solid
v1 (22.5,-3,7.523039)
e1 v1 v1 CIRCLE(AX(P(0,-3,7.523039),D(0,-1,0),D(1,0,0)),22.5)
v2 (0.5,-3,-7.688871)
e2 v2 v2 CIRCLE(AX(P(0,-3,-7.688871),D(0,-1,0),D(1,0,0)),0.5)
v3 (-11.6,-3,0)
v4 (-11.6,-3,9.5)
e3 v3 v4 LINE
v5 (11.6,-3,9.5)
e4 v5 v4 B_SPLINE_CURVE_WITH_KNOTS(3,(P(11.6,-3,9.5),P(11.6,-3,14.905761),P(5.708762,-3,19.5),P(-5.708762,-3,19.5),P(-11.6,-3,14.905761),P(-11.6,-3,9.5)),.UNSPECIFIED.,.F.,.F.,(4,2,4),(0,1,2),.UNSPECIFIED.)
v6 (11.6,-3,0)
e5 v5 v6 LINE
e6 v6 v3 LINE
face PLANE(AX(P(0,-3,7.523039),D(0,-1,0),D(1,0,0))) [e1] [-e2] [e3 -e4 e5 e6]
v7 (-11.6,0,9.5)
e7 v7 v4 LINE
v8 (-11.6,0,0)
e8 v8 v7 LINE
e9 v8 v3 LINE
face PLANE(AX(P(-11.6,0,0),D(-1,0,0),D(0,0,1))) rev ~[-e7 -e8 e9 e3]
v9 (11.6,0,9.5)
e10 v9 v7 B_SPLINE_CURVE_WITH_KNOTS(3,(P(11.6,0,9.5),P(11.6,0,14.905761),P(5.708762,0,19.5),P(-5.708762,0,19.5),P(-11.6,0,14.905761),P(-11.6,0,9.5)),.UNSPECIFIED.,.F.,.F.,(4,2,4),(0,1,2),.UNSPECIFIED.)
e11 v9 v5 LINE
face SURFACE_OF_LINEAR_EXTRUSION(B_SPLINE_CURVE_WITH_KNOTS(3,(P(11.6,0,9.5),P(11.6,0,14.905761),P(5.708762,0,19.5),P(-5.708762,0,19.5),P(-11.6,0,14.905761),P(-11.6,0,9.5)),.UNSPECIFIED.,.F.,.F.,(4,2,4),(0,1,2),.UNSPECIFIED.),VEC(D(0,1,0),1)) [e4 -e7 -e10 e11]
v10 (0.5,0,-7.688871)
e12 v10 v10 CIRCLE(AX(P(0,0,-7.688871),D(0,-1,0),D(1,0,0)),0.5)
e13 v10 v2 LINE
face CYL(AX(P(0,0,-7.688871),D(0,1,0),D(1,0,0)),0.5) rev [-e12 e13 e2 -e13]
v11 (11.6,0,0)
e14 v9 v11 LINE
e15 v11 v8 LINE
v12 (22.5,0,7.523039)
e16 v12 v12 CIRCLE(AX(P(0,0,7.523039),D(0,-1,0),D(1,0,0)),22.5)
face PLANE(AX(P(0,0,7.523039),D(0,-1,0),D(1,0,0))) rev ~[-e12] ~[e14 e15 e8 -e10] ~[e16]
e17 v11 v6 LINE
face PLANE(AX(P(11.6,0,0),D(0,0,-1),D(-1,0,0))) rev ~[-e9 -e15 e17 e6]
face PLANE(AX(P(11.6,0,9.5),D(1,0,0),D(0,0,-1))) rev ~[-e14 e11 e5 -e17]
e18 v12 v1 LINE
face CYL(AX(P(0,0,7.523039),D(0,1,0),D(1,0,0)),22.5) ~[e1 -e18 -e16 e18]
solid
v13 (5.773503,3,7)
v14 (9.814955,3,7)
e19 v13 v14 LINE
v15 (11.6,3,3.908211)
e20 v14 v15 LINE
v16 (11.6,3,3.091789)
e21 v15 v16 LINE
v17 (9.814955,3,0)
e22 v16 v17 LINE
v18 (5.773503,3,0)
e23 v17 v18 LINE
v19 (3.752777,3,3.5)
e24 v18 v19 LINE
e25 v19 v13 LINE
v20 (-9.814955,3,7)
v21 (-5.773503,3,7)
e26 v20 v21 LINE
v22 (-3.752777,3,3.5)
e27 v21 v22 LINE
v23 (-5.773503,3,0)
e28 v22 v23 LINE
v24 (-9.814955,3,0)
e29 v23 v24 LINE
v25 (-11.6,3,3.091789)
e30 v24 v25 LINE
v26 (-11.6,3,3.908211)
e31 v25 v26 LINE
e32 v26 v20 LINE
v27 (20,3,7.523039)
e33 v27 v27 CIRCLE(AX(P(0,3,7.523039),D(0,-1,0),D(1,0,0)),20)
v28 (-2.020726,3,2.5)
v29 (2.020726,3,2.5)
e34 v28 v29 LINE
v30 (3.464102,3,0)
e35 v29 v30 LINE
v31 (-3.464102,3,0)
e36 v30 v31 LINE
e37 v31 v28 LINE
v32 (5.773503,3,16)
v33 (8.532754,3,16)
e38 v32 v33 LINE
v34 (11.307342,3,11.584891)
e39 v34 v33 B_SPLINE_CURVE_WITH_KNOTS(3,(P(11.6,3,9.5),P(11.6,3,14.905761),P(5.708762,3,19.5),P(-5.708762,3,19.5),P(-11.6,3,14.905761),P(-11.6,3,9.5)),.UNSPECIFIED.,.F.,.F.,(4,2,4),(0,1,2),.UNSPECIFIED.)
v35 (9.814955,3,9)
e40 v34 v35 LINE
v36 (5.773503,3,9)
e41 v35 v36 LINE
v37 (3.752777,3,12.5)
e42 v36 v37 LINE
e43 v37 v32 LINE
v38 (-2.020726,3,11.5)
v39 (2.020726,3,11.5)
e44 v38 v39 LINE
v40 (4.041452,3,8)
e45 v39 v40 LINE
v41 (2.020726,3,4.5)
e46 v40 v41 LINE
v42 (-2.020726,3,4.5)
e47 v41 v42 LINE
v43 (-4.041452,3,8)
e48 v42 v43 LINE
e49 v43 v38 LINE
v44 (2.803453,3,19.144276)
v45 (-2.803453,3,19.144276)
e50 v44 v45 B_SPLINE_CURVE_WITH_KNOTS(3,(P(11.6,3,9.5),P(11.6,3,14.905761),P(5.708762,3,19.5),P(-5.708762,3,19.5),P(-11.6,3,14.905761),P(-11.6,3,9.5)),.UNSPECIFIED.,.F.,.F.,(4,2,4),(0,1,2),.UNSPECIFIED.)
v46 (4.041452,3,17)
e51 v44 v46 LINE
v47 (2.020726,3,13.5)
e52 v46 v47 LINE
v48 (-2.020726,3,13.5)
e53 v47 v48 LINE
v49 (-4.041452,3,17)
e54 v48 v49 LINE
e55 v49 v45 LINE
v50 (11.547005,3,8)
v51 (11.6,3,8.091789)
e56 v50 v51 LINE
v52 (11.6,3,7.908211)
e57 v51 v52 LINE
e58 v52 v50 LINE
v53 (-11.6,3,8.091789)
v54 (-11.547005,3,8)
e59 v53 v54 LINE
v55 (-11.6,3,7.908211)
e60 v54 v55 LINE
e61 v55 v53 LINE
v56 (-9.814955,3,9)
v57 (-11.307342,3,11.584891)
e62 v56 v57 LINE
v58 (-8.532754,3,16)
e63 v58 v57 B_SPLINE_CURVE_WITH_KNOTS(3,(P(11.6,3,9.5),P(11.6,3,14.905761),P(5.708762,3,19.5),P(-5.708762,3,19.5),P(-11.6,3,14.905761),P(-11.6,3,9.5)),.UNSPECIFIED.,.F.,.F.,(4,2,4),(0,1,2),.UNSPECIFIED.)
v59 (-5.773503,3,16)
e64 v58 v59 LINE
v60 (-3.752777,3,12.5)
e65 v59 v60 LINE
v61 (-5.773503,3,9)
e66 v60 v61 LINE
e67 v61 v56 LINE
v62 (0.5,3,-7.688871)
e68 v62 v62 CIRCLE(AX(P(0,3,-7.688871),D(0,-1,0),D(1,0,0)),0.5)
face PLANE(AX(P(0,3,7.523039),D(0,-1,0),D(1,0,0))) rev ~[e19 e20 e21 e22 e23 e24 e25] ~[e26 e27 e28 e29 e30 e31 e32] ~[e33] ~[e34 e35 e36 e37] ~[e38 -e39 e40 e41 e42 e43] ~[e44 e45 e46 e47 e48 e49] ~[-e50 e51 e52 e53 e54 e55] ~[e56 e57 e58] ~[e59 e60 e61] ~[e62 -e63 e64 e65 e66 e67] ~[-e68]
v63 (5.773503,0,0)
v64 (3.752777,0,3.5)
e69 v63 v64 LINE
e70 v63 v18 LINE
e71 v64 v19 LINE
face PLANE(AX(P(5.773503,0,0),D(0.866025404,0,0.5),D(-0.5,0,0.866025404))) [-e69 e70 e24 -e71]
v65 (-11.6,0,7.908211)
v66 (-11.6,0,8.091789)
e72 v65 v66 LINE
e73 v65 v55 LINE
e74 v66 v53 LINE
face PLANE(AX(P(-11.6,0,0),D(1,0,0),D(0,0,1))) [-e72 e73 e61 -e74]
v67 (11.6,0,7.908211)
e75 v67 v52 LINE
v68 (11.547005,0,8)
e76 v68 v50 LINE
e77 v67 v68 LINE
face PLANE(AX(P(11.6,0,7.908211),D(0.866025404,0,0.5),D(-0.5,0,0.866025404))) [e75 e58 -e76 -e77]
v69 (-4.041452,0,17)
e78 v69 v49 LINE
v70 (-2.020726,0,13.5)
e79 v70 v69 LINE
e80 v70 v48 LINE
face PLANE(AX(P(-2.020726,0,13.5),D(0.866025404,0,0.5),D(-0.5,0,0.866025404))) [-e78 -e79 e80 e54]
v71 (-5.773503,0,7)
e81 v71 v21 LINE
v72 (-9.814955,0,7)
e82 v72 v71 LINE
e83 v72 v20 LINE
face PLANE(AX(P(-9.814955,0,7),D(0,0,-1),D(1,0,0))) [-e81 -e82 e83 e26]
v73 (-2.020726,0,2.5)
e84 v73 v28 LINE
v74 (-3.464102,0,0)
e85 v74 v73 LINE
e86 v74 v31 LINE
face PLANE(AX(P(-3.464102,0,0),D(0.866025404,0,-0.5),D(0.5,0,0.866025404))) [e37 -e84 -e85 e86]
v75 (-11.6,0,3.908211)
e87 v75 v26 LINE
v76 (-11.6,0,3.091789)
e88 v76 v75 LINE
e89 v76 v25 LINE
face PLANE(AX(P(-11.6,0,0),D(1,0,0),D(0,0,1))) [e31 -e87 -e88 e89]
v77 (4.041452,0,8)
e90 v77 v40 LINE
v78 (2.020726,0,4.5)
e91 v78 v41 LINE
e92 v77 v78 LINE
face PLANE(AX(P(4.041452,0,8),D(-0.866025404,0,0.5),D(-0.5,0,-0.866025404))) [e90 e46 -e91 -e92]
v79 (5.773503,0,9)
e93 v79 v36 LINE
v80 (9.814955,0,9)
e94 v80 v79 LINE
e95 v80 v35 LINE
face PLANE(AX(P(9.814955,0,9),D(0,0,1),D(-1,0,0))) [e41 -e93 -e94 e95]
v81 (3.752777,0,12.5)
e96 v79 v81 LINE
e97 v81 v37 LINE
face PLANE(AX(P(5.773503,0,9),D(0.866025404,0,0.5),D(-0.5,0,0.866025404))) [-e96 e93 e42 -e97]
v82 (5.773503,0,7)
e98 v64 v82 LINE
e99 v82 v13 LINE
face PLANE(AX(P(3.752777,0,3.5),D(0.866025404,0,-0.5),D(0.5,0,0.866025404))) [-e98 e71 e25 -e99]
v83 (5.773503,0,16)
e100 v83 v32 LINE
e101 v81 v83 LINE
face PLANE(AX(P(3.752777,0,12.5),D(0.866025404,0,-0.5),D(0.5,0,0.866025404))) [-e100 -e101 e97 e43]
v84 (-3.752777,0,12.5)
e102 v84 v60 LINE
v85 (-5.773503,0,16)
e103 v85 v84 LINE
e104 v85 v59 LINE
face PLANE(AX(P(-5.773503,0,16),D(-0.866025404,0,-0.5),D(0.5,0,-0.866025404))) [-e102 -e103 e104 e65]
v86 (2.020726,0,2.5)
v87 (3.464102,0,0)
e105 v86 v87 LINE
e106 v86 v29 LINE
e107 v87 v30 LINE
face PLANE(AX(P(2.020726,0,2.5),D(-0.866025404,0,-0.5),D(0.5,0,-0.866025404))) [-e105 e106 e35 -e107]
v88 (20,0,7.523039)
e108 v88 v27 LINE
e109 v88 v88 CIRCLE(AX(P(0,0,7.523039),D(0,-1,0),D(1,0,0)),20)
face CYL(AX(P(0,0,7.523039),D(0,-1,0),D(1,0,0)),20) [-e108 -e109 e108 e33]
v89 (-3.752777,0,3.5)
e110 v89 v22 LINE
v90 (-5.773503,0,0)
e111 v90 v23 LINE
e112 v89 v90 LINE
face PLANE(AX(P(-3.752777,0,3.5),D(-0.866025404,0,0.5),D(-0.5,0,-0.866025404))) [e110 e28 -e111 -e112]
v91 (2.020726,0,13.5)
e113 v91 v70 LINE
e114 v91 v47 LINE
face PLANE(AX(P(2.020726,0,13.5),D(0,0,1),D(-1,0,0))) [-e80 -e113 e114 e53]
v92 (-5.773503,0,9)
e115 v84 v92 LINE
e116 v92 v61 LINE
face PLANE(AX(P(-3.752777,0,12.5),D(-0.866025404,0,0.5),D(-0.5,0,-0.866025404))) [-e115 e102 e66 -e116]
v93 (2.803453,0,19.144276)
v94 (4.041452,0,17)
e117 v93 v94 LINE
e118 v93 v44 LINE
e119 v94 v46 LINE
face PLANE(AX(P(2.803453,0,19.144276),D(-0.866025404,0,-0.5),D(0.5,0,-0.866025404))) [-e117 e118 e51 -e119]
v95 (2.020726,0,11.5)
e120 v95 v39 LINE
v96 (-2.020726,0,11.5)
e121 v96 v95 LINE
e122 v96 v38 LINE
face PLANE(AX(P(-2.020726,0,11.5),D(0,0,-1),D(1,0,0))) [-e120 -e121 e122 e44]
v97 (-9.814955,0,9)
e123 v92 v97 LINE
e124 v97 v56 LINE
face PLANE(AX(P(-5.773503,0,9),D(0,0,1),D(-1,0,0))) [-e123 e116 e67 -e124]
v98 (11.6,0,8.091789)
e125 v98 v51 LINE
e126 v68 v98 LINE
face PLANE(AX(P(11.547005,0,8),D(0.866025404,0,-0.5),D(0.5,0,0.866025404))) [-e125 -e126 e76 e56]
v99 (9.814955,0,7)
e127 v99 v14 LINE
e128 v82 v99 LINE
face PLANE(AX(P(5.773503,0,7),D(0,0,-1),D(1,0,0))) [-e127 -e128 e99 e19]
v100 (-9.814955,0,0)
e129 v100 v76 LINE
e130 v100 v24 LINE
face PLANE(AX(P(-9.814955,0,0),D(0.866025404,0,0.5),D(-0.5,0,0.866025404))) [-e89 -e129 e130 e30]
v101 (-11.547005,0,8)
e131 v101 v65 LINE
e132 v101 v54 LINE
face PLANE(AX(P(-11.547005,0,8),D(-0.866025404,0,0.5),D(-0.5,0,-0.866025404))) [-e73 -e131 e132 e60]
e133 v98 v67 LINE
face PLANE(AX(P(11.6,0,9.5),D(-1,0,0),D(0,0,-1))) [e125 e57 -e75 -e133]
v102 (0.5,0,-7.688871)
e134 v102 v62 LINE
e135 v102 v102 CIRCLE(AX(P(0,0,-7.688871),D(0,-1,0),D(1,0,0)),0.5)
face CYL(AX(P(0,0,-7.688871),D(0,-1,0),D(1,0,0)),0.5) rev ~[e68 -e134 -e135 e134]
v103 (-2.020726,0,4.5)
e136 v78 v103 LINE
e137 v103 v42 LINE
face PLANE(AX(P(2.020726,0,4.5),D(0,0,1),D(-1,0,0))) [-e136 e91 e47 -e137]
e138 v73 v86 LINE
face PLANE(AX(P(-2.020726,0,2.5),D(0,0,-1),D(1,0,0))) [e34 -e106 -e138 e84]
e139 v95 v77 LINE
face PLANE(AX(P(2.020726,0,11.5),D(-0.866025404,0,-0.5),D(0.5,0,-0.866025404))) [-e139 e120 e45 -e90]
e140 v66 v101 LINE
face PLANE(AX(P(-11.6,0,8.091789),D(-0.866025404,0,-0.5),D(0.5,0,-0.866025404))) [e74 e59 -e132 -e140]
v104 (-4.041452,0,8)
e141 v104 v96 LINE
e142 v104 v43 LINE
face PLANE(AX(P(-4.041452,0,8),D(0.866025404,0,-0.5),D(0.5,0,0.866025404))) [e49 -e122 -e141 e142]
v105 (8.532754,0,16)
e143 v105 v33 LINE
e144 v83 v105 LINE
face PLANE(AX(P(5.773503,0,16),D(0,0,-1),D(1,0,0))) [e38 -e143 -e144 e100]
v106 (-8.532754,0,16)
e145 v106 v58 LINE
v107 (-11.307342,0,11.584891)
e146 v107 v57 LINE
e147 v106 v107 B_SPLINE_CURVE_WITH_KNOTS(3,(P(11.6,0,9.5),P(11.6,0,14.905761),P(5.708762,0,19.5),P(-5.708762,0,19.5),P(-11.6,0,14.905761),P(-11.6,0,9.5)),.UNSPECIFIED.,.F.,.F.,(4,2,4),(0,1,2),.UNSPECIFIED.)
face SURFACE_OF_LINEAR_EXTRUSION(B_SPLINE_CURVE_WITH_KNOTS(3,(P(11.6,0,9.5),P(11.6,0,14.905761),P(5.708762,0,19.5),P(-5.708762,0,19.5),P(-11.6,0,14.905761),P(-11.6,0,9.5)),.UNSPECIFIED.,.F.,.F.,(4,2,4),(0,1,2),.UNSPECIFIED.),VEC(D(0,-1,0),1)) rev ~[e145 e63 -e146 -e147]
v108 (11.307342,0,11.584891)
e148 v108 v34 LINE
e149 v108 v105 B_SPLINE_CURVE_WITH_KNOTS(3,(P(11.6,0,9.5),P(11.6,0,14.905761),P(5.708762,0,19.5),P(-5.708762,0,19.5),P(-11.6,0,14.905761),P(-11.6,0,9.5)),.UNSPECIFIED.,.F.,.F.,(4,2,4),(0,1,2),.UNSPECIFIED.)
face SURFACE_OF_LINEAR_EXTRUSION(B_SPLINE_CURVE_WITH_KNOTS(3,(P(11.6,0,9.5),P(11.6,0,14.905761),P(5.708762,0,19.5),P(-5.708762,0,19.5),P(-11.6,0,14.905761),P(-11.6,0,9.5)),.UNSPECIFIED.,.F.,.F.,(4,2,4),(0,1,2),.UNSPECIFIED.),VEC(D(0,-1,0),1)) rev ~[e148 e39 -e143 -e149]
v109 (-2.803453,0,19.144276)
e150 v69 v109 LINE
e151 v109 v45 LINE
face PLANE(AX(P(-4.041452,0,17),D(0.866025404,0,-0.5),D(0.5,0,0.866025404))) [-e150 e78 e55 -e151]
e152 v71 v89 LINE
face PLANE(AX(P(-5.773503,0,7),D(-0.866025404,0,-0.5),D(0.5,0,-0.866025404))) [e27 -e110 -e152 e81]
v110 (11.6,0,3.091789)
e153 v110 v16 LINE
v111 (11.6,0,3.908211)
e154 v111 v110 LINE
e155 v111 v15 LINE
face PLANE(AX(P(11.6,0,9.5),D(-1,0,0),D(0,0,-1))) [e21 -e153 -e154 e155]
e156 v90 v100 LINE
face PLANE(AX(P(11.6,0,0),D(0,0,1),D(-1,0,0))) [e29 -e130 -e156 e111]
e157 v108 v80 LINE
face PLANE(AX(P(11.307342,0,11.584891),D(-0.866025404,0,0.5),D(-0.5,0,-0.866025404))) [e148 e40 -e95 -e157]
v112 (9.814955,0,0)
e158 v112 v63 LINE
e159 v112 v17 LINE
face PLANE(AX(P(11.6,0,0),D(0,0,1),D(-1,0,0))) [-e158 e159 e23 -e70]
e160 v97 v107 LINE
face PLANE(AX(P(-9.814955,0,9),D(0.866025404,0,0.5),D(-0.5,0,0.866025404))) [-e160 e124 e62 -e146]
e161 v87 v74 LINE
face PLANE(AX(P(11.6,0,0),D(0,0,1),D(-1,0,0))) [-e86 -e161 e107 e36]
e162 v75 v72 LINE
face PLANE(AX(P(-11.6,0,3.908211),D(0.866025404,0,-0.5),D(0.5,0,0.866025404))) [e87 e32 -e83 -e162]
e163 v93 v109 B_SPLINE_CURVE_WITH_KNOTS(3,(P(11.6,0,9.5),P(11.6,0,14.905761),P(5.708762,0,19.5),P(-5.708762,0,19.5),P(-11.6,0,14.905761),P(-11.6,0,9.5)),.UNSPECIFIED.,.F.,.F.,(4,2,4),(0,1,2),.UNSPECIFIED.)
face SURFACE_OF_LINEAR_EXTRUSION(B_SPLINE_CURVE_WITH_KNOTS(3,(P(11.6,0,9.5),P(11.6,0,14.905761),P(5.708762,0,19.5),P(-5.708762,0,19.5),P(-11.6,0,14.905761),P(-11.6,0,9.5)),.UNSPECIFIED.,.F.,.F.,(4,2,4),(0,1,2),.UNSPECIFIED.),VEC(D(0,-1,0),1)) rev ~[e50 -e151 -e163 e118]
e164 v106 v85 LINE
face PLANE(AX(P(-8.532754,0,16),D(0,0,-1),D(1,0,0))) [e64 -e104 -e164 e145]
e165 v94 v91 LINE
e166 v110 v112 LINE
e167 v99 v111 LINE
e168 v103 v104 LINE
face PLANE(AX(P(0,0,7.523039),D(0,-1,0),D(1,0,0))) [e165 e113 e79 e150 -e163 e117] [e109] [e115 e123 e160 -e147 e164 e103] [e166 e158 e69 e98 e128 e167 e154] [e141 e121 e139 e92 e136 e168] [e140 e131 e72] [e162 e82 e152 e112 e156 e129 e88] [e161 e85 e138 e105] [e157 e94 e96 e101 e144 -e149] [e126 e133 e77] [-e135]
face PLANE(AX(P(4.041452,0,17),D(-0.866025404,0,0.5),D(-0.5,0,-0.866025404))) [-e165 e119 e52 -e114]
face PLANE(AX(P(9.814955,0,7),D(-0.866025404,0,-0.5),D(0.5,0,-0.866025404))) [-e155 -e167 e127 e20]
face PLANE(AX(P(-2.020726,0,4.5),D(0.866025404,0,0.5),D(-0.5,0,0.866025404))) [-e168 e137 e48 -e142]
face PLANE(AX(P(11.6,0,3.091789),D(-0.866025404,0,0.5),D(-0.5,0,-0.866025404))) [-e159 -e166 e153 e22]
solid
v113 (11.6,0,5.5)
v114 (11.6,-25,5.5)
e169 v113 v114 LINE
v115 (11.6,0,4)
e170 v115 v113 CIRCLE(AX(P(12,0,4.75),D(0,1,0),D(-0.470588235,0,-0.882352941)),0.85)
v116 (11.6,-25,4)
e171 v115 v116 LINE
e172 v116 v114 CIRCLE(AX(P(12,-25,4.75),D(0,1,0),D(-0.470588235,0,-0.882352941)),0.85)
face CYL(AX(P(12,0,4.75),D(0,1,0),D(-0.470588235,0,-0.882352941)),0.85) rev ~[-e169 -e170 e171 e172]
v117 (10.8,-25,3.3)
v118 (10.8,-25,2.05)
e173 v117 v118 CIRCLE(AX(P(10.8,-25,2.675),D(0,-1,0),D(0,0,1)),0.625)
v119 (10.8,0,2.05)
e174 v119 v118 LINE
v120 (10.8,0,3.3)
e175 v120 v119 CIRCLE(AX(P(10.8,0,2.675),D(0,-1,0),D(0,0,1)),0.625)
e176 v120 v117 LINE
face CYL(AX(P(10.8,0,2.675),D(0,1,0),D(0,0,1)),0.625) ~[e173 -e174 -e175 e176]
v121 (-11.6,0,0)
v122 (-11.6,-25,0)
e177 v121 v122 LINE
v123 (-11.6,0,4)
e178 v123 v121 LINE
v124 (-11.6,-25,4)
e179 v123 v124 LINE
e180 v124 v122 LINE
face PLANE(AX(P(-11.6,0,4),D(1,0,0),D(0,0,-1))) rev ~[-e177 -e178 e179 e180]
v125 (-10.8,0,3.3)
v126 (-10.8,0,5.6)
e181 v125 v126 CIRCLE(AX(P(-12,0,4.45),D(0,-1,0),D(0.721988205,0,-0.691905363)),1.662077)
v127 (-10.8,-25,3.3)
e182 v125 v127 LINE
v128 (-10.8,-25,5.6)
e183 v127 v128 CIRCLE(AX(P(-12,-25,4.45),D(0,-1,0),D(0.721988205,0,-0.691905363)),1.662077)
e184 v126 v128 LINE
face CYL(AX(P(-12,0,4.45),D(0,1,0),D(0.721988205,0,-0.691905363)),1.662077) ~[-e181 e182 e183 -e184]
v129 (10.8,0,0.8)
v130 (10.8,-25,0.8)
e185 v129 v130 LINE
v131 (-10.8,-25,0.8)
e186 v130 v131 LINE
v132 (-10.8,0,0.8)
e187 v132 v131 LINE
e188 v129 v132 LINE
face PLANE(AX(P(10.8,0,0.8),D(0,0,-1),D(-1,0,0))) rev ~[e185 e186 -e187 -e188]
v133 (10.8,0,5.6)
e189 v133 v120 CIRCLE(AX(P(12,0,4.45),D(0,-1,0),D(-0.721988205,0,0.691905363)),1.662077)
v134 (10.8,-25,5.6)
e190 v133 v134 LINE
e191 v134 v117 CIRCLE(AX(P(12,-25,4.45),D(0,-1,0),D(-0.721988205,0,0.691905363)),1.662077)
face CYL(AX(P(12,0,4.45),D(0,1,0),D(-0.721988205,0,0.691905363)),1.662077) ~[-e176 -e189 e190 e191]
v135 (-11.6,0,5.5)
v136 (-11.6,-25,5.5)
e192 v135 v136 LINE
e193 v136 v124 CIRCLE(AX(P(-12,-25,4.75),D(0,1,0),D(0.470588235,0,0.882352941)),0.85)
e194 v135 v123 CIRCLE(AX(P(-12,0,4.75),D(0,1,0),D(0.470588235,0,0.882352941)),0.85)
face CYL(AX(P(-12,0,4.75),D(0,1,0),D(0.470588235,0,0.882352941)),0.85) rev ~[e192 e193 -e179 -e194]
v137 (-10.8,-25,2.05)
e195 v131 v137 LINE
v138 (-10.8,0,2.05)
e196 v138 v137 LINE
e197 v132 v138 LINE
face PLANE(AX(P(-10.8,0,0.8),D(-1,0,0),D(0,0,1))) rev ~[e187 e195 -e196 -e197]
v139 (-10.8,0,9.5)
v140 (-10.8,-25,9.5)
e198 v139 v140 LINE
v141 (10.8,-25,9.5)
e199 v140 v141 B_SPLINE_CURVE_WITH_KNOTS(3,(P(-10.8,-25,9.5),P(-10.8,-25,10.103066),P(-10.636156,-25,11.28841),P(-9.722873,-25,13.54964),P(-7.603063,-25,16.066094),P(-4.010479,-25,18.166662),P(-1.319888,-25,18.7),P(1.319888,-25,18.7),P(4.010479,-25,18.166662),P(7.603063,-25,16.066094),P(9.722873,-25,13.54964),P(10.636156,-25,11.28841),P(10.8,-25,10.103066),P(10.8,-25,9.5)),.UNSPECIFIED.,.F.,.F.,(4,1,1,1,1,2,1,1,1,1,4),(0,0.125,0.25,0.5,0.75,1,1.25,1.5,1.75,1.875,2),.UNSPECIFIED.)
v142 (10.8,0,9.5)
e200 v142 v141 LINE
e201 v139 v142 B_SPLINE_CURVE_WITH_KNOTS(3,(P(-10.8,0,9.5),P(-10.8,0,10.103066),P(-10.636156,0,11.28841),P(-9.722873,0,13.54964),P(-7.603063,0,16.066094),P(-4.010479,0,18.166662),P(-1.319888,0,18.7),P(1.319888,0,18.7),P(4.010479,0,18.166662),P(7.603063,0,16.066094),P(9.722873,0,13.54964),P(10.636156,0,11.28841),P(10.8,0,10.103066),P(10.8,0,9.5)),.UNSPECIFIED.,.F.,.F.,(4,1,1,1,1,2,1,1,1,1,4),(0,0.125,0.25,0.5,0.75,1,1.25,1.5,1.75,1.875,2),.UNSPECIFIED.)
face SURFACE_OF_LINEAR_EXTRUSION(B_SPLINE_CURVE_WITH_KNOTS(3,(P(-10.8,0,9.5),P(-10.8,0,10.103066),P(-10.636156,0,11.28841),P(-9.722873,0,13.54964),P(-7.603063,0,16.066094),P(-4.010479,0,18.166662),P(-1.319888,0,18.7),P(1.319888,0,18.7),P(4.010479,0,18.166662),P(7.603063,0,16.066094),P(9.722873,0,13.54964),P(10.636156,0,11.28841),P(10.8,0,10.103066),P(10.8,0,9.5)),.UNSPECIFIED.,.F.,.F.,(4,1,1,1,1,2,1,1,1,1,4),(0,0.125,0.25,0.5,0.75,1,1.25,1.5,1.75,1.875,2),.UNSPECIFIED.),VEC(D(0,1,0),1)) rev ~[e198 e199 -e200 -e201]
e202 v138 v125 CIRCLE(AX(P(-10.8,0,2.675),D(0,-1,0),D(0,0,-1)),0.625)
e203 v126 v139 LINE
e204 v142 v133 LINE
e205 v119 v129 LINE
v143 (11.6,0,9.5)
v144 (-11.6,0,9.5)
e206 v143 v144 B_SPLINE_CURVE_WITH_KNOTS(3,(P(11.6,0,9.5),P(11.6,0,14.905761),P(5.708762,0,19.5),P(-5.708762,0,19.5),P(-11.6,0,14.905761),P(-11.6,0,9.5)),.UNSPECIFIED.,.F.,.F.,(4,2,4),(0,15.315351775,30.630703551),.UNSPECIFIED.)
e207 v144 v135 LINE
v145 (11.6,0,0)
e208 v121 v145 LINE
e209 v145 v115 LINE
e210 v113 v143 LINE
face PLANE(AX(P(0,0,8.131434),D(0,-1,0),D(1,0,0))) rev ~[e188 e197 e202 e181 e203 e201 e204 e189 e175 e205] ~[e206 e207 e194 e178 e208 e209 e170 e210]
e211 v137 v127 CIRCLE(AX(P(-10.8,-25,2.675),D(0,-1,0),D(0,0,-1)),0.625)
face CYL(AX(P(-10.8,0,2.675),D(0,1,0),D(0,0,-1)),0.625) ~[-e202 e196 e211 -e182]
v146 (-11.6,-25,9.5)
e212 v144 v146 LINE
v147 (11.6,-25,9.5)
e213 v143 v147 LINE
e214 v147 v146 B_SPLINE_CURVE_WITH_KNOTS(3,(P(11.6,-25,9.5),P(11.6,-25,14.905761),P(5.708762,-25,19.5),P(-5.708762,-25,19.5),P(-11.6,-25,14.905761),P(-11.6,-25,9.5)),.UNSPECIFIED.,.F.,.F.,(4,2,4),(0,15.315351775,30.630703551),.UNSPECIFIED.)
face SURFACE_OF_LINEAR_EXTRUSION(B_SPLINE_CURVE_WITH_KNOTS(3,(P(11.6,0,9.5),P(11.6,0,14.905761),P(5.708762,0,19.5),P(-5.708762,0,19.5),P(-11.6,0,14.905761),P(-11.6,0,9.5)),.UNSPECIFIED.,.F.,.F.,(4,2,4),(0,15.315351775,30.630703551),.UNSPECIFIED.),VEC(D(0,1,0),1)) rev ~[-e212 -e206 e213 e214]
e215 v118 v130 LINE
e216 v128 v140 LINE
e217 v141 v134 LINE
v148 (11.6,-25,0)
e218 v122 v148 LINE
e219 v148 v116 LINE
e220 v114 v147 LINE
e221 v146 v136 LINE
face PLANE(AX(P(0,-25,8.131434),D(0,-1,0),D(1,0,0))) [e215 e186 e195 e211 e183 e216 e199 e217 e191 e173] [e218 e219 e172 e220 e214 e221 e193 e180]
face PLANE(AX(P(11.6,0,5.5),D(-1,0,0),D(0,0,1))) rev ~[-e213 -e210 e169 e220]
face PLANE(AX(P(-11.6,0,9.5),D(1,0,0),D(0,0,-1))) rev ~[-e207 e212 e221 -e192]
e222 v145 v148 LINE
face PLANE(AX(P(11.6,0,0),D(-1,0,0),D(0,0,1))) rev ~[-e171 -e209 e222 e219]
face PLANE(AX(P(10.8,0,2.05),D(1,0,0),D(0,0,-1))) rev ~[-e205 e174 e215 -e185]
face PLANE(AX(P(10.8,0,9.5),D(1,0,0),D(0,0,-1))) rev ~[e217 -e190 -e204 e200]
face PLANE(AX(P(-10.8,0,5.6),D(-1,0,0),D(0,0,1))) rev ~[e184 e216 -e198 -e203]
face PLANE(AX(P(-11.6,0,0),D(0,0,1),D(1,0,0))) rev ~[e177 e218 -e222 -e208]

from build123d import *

# Parameters (mm, degrees)
F1_DEPTH = 25
F2_R     = 22.5
F2_R_2   = 20
F2_R_3   = 0.5
F3_DEPTH = 3
F5_DEPTH = 3


# Not quite as in the source:
# - the dataset's text gives a spline's control points without its knots; the knots are read off the source's solid
# - a feature names something its author has since deleted; it is built from what else it names


with BuildPart() as f1:
    # F0 (on Front) → F1 (new body)
    with BuildSketch(Plane.XZ):
        with BuildLine():
            Line((-11.6, 4), (-11.6, 0))
            Line((-11.6, 0), (11.6, 0))
            Line((11.6, 0), (11.6, 4))
            ThreePointArc((11.6, 4), (11.15, 4.75), (11.6, 5.5))
            Line((11.6, 5.5), (11.6, 9.5))
            add(Edge.make_bspline(
                [(11.6, 9.5), (11.6, 14.9057612107), (5.7087616122, 19.5), (0, 19.5)],
                knots=[0, 0, 0, 0, 15.3153517753, 15.3153517753, 15.3153517753, 15.3153517753], degree=3))
            add(Edge.make_bspline(
                [(-11.6, 9.5), (-11.6, 14.9057612107), (-5.7087616122, 19.5), (0, 19.5)],
                knots=[0, 0, 0, 0, 15.3153517753, 15.3153517753, 15.3153517753, 15.3153517753], degree=3))
            Line((-11.6, 9.5), (-11.6, 5.5))
            ThreePointArc((-11.6, 5.5), (-11.15, 4.75), (-11.6, 4))
        make_face()
        with BuildLine():
            Line((10.8, 0.8), (0, 0.8))
            Line((0, 0.8), (-10.8, 0.8))
            Line((-10.8, 0.8), (-10.8, 2.05))
            ThreePointArc((-10.8, 2.05), (-10.175, 2.675), (-10.8, 3.3))
            ThreePointArc((-10.8, 3.3), (-10.3379229861, 4.45), (-10.8, 5.6))
            Line((-10.8, 5.6), (-10.8, 9.5))
            add(Edge.make_bspline(
                [(-10.8, 9.5), (-10.8, 10.1030663269), (-10.6361560663, 11.2884100286), (-9.7228728088, 13.5496398504), (-7.603062861, 16.0660942728), (-4.0104787703, 18.1666619497), (-1.3198877666, 18.7), (0, 18.7)],
                knots=[0, 0, 0, 0, 0.125, 0.25, 0.5, 0.75, 1, 1, 1, 1], degree=3))
            add(Edge.make_bspline(
                [(10.8, 9.5), (10.8, 10.1030663269), (10.6361560663, 11.2884100286), (9.7228728088, 13.5496398504), (7.603062861, 16.0660942728), (4.0104787703, 18.1666619497), (1.3198877666, 18.7), (0, 18.7)],
                knots=[0, 0, 0, 0, 0.125, 0.25, 0.5, 0.75, 1, 1, 1, 1], degree=3))
            Line((10.8, 9.5), (10.8, 5.6))
            ThreePointArc((10.8, 5.6), (10.3379229861, 4.45), (10.8, 3.3))
            ThreePointArc((10.8, 3.3), (10.175, 2.675), (10.8, 2.05))
            Line((10.8, 2.05), (10.8, 0.8))
        make_face(mode=Mode.SUBTRACT)
    extrude(amount=F1_DEPTH)


with BuildPart() as f3:
    # F2 (on Front) → F3 (new body)
    with BuildSketch(Plane.XZ):
        with Locations((0, 7.5230388902)):
            Circle(F2_R)
        with Locations((0, 7.5230388902)):
            Circle(F2_R_2, mode=Mode.SUBTRACT)
        with Locations((0, 7.5230388902)):
            Circle(F2_R_2)
        with Locations((0, -7.6888706521)):
            Circle(F2_R_3, mode=Mode.SUBTRACT)
        with BuildLine():
            add(Edge.make_bspline(
                [(0, 19.5), (-5.7087616122, 19.5), (-11.6, 14.9057612107), (-11.6, 9.5)],
                knots=[0, 0, 0, 0, 1, 1, 1, 1], degree=3))
            add(Edge.make_bspline(
                [(11.6, 9.5), (11.6, 14.9057612107), (5.7087616122, 19.5), (0, 19.5)],
                knots=[0, 0, 0, 0, 1, 1, 1, 1], degree=3))
            Line((11.6, 9.5), (11.6, 5.5))
            Line((11.6, 5.5), (11.6, 4))
            Line((11.6, 4), (11.6, 0))
            Line((11.6, 0), (-11.6, 0))
            Line((-11.6, 0), (-11.6, 4))
            Line((-11.6, 4), (-11.6, 5.5))
            Line((-11.6, 5.5), (-11.6, 9.5))
        make_face(mode=Mode.SUBTRACT)
    extrude(amount=F3_DEPTH)


with BuildPart() as f5:
    # F4 (on Front) → F5 (new body)
    with BuildSketch(Plane.XZ):
        with BuildLine():
            Line((-11.6, 9.5), (-11.6, 8.0917893678))
            Line((-11.6, 8.0917893678), (-11.5470053838, 8))
            Line((-11.5470053838, 8), (-11.6, 7.9082106322))
            Line((-11.6, 7.9082106322), (-11.6, 3.9082106322))
            Line((-11.6, 3.9082106322), (-9.8149545762, 7))
            Line((-9.8149545762, 7), (-5.7735026919, 7))
            Line((-5.7735026919, 7), (-3.7527767497, 3.5))
            Line((-3.7527767497, 3.5), (-5.7735026919, 0))
            Line((-5.7735026919, 0), (-3.4641016151, 0))
            Line((-3.4641016151, 0), (-2.0207259422, 2.5))
            Line((-2.0207259422, 2.5), (2.0207259422, 2.5))
            Line((2.0207259422, 2.5), (3.4641016151, 0))
            Line((3.4641016151, 0), (5.7735026919, 0))
            Line((5.7735026919, 0), (3.7527767497, 3.5))
            Line((3.7527767497, 3.5), (5.7735026919, 7))
            Line((5.7735026919, 7), (9.8149545762, 7))
            Line((9.8149545762, 7), (11.6, 3.9082106322))
            Line((11.6, 3.9082106322), (11.6, 7.9082106322))
            Line((11.6, 7.9082106322), (11.5470053838, 8))
            Line((11.5470053838, 8), (11.6, 8.0917893678))
            Line((11.6, 8.0917893678), (11.6, 9.5))
            add(Edge.make_bspline(
                [(11.6, 9.5), (11.6, 10.2119185774), (11.4978229092, 10.9097621854), (11.3073418694, 11.5848906163)],
                knots=[0, 0, 0, 0, 0.1316962681, 0.1316962681, 0.1316962681, 0.1316962681], degree=3))
            Line((11.3073418694, 11.5848906163), (9.8149545762, 9))
            Line((9.8149545762, 9), (5.7735026919, 9))
            Line((5.7735026919, 9), (3.7527767497, 12.5))
            Line((3.7527767497, 12.5), (5.7735026919, 16))
            Line((5.7735026919, 16), (8.5327536542, 16))
            add(Edge.make_bspline(
                [(8.5327536542, 16), (6.9682227077, 17.4875332287), (4.9454375756, 18.606013275), (2.8034534401, 19.1442762052)],
                knots=[0.453411459, 0.453411459, 0.453411459, 0.453411459, 0.8355950075, 0.8355950075, 0.8355950075, 0.8355950075], degree=3))
            Line((2.8034534401, 19.1442762052), (4.0414518843, 17))
            Line((4.0414518843, 17), (2.0207259422, 13.5))
            Line((2.0207259422, 13.5), (-2.0207259422, 13.5))
            Line((-2.0207259422, 13.5), (-4.0414518843, 17))
            Line((-4.0414518843, 17), (-2.8034534401, 19.1442762052))
            add(Edge.make_bspline(
                [(-2.8034534401, 19.1442762052), (-4.9454375756, 18.606013275), (-6.9682227077, 17.4875332287), (-8.5327536542, 16)],
                knots=[0.1644049925, 0.1644049925, 0.1644049925, 0.1644049925, 0.546588541, 0.546588541, 0.546588541, 0.546588541], degree=3))
            Line((-8.5327536542, 16), (-5.7735026919, 16))
            Line((-5.7735026919, 16), (-3.7527767497, 12.5))
            Line((-3.7527767497, 12.5), (-5.7735026919, 9))
            Line((-5.7735026919, 9), (-9.8149545762, 9))
            Line((-9.8149545762, 9), (-11.3073418694, 11.5848906163))
            add(Edge.make_bspline(
                [(-11.3073418694, 11.5848906163), (-11.4978229092, 10.9097621854), (-11.6, 10.2119185774), (-11.6, 9.5)],
                knots=[0.8683037319, 0.8683037319, 0.8683037319, 0.8683037319, 1, 1, 1, 1], degree=3))
        make_face()
        Polygon((-2.0207259422, 11.5), (2.0207259422, 11.5), (4.0414518843, 8), (2.0207259422, 4.5), (-2.0207259422, 4.5), (-4.0414518843, 8), align=None, mode=Mode.SUBTRACT)
    extrude(amount=-F5_DEPTH)



with BuildPart() as f5b:
    # F4 (on Front) → F5, piece 2 (new body)
    with BuildSketch(Plane.XZ):
        Polygon((11.6, 3.0917893678), (9.8149545762, 0), (11.6, 0), align=None)
    extrude(amount=-F5_DEPTH)


with BuildPart() as f5c:
    # F4 (on Front) → F5, piece 3 (new body)
    with BuildSketch(Plane.XZ):
        Polygon((-9.8149545762, 0), (-11.6, 3.0917893678), (-11.6, 0), align=None)
    extrude(amount=-F5_DEPTH)


with BuildPart() as f5_1:
    add(f5.part)

    add(f5b.part)  # F5#4 merges F5b

    add(f5c.part)  # F5#4 merges F5c
    # F2 (on Front) → F5, piece 4 (join)
    with BuildSketch(Plane.XZ):
        with Locations((0, 7.5230388902)):
            Circle(F2_R_2)
        with Locations((0, -7.6888706521)):
            Circle(F2_R_3, mode=Mode.SUBTRACT)
        with BuildLine():
            add(Edge.make_bspline(
                [(0, 19.5), (-5.7087616122, 19.5), (-11.6, 14.9057612107), (-11.6, 9.5)],
                knots=[0, 0, 0, 0, 1, 1, 1, 1], degree=3))
            add(Edge.make_bspline(
                [(11.6, 9.5), (11.6, 14.9057612107), (5.7087616122, 19.5), (0, 19.5)],
                knots=[0, 0, 0, 0, 1, 1, 1, 1], degree=3))
            Line((11.6, 9.5), (11.6, 5.5))
            Line((11.6, 5.5), (11.6, 4))
            Line((11.6, 4), (11.6, 0))
            Line((11.6, 0), (-11.6, 0))
            Line((-11.6, 0), (-11.6, 4))
            Line((-11.6, 4), (-11.6, 5.5))
            Line((-11.6, 5.5), (-11.6, 9.5))
        make_face(mode=Mode.SUBTRACT)
    extrude(amount=-F5_DEPTH)


solid = Compound([f1.part, f3.part, f5_1.part])
